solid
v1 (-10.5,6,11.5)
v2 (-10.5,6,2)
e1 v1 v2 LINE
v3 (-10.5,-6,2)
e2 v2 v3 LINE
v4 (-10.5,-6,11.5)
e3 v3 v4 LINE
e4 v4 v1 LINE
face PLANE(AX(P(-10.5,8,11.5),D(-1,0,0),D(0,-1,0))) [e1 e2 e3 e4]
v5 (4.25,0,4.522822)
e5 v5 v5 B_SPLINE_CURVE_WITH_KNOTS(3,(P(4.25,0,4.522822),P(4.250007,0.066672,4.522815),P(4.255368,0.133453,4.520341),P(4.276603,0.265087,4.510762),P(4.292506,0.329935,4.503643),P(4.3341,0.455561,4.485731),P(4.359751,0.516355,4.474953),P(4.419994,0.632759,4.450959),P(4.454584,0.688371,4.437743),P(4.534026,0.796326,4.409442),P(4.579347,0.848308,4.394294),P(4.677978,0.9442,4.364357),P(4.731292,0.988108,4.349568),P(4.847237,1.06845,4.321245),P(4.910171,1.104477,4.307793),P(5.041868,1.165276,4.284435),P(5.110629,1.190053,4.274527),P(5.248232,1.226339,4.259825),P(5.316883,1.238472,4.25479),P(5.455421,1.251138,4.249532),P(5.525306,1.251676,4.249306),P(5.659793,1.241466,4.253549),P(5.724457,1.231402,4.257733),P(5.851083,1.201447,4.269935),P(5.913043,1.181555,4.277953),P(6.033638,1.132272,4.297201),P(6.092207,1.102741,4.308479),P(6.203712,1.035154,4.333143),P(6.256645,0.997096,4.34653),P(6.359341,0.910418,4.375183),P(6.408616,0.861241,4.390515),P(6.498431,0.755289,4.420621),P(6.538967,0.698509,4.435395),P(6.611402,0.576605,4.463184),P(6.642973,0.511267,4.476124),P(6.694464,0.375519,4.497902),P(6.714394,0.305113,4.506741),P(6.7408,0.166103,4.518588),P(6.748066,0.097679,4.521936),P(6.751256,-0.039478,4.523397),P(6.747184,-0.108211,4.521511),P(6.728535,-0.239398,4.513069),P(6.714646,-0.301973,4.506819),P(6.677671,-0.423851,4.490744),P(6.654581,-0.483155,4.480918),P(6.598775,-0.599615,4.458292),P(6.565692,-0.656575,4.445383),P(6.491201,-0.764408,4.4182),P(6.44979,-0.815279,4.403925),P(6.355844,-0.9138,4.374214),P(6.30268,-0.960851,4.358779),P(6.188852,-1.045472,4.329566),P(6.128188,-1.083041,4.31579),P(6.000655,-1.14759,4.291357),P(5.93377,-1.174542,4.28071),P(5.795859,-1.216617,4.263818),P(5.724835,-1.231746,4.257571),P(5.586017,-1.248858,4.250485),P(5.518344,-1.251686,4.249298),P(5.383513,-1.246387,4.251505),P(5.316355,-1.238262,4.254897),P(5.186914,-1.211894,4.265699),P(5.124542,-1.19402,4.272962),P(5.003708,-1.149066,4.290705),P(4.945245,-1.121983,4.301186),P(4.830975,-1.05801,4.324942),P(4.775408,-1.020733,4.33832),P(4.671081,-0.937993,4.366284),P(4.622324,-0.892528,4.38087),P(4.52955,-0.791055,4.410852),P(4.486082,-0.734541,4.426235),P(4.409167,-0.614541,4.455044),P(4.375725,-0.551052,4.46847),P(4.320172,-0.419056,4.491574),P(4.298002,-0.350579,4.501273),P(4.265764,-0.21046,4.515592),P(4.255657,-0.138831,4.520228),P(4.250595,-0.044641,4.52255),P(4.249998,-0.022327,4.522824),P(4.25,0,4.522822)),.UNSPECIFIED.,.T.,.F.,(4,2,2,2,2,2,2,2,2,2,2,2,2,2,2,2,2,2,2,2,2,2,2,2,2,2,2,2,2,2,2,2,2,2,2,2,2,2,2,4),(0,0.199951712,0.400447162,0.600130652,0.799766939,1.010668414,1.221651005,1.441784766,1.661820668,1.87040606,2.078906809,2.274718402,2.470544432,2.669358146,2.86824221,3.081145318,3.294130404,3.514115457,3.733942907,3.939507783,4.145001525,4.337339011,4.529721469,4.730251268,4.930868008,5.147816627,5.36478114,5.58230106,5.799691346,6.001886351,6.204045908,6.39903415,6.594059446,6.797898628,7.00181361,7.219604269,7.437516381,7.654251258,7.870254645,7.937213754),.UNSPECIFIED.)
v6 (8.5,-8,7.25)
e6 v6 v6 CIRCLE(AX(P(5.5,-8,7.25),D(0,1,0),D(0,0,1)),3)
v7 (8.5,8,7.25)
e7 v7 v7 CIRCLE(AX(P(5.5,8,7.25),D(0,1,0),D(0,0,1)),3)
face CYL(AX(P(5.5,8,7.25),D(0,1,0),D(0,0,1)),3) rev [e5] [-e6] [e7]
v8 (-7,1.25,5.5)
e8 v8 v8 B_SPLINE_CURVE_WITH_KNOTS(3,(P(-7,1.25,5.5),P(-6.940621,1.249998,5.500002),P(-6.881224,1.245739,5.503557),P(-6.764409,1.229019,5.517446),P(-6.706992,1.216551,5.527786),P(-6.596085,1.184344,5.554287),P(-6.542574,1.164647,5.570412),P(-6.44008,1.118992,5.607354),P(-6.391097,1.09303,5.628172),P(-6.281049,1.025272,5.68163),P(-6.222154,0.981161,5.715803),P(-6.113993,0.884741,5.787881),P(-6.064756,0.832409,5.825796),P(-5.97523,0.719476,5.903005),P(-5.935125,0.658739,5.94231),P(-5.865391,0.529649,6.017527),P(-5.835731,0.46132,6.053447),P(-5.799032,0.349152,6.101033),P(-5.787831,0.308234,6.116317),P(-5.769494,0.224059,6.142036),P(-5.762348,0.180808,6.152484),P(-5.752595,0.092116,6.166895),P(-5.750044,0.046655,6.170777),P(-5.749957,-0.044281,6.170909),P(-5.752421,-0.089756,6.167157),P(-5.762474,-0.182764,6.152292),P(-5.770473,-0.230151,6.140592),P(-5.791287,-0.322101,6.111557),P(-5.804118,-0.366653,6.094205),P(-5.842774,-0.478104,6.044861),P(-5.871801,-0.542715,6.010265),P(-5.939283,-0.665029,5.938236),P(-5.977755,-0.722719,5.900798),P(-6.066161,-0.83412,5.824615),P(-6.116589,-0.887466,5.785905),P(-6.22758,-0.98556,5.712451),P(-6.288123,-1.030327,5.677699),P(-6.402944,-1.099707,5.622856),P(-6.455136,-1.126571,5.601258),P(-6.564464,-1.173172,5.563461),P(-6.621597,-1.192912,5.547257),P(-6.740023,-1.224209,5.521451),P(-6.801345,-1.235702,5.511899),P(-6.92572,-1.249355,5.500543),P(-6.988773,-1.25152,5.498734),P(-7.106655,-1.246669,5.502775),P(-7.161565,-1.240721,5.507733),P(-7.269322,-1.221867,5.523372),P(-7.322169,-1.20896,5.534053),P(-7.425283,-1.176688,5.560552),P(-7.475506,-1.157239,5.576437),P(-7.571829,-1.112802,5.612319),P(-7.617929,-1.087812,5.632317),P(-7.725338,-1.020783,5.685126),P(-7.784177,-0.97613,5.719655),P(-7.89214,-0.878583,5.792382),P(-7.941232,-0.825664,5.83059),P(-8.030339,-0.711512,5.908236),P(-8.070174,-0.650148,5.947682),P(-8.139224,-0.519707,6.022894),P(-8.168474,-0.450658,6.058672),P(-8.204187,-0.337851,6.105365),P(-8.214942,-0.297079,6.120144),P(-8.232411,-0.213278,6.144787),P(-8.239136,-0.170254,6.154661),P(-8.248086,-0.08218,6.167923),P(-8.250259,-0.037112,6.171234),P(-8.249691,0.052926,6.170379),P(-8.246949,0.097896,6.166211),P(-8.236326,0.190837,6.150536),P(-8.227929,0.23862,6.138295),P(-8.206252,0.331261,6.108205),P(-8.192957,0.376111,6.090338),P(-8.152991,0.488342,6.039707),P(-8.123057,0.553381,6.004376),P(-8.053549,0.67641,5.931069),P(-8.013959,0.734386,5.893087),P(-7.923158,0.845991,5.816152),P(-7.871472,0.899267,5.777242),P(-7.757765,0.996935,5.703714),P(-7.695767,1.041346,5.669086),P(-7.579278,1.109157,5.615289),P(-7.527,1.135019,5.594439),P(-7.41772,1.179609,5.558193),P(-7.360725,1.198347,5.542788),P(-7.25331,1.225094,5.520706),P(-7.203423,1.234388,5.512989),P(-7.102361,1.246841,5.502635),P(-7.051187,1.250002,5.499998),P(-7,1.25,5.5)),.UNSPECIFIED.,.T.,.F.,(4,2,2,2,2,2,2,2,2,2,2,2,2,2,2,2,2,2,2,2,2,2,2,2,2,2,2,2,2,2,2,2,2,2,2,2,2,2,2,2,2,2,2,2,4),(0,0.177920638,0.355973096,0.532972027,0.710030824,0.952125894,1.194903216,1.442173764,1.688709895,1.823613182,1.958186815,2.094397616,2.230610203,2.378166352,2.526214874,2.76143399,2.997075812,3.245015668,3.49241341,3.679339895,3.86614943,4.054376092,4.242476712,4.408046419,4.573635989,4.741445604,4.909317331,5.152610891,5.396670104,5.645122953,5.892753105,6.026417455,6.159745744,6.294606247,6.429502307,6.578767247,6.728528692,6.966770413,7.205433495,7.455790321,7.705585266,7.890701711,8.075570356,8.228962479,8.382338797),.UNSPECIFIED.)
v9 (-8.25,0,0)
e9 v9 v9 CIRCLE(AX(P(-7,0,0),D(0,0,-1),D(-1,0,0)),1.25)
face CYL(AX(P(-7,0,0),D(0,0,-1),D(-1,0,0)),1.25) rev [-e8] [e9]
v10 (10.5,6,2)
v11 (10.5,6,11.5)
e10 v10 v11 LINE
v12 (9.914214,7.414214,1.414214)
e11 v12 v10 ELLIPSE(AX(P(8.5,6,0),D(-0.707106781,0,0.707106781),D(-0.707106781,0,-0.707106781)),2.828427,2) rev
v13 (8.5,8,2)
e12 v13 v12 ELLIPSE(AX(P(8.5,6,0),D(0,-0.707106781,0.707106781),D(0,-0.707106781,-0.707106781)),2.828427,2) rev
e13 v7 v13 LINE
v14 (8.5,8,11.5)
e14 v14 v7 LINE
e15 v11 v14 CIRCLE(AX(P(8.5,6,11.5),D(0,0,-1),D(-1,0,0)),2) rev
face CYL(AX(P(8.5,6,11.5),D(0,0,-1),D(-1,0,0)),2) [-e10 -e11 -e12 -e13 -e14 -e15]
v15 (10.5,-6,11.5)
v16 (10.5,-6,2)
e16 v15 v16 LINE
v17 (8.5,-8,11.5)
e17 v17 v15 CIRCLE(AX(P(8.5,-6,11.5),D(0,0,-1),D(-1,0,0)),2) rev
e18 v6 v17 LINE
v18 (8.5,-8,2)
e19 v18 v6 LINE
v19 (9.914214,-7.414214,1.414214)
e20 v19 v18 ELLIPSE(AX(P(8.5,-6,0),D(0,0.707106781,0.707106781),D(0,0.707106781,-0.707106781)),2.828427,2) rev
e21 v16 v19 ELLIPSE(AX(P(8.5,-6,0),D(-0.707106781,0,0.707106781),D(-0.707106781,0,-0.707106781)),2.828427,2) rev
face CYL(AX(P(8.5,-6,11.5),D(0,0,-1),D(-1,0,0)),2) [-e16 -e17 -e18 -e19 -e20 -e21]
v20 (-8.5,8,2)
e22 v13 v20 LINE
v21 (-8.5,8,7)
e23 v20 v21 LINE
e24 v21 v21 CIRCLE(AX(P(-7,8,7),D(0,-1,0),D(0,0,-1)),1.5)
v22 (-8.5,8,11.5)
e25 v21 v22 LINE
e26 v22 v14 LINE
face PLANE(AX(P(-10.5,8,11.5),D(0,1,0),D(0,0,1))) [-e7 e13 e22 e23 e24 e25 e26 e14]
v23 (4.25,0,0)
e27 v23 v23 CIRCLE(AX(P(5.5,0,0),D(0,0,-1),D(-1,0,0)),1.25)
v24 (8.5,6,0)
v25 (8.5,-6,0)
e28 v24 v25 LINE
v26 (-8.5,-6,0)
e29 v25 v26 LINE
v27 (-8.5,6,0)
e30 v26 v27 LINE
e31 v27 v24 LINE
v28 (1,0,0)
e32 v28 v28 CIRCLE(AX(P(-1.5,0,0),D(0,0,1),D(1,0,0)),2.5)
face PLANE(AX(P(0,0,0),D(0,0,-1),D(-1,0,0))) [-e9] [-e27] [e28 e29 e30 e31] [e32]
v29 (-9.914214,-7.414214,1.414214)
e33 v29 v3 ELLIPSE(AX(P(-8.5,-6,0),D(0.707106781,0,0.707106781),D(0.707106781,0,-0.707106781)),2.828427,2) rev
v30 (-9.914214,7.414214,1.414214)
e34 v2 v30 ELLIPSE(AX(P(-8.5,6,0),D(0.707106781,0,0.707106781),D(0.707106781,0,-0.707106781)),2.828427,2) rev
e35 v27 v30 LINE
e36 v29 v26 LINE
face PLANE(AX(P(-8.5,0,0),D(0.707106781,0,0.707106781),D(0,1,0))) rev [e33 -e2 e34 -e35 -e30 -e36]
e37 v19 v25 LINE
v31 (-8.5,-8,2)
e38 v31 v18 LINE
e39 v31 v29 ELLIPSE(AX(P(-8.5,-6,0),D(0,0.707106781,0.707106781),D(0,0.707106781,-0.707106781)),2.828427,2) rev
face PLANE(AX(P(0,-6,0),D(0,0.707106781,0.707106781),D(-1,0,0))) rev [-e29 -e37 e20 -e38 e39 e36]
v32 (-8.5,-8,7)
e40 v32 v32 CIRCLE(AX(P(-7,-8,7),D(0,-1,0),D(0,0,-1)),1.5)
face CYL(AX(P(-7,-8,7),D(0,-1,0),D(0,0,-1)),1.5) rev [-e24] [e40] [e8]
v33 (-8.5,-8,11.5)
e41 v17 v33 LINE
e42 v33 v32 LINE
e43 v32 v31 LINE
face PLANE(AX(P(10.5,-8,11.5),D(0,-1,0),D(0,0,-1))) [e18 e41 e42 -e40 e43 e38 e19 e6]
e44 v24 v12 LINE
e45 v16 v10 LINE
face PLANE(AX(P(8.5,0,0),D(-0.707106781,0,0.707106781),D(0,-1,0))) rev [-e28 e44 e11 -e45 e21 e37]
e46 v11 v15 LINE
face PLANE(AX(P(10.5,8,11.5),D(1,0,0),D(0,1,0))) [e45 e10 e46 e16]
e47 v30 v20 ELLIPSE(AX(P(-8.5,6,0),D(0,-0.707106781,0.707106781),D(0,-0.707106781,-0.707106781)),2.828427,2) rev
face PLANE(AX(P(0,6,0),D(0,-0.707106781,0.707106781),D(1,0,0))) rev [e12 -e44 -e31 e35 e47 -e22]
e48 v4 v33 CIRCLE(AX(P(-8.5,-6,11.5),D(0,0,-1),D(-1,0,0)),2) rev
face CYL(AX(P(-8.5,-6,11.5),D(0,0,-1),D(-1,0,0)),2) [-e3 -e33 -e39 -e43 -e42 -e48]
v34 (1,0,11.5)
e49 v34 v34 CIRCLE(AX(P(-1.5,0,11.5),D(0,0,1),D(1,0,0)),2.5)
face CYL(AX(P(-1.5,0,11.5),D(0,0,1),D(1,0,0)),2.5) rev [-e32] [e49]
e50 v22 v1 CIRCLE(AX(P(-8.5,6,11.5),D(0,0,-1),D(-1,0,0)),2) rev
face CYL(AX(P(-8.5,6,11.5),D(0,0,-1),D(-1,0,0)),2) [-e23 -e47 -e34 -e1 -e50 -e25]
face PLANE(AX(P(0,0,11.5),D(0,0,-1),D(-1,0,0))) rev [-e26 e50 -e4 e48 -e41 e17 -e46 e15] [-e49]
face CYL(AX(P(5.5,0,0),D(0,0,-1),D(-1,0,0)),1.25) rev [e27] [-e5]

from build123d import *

# Parameters (mm, degrees)
SKETCH1_W                  = 21
SKETCH1_H                  = 16
BOSS_EXTRUDE1_DEPTH        = 11.5
F_10_CLEARANCE_HOLE1_D     = 5
F_12_CLEARANCE_HOLE1_D     = 6
F_2_CLEARANCE_HOLE1_REACH  = 19.507
F_2_CLEARANCE_HOLE1_BORE_R = 1.25
F_3_CLEARANCE_HOLE2_D      = 3
F_2_CLEARANCE_HOLE2_REACH  = 19.507
F_2_CLEARANCE_HOLE2_BORE_R = 1.25
CHAMFER2_SIZE              = 2
FILLET1_R                  = 2


with BuildPart() as part:
    # Sketch1 → Boss-Extrude1 (new body)
    with BuildSketch(Plane(origin=(0, 0, 0), x_dir=(-1, 0, 0), z_dir=(0, 0, -1))):
        Rectangle(SKETCH1_W, SKETCH1_H)
    extrude(amount=-BOSS_EXTRUDE1_DEPTH)

    # #10 Clearance Hole1 (through all)
    with Locations(Plane.XY.offset(11.5)):
        with Locations((-1.5, 0)):
            Hole(F_10_CLEARANCE_HOLE1_D / 2)

    # #12 Clearance Hole1 (through all)
    with Locations(Plane(origin=(0, 8, 0), x_dir=(1, 0, 0), z_dir=(0, 1, 0))):
        with Locations((5.5, -7.25)):
            Hole(F_12_CLEARANCE_HOLE1_D / 2)

    # #2 Clearance Hole1 bore → #2 Clearance Hole1 (cut, up to next)
    with BuildSketch(Plane(origin=(0, 0, 0), x_dir=(-1, 0, 0), z_dir=(0, 0, -1)), mode=Mode.PRIVATE) as f_2_clearance_hole1_sk1:
        with Locations((-5.5, 0)):
            Circle(F_2_CLEARANCE_HOLE1_BORE_R)
    f_2_clearance_hole1_tool1 = extrude(f_2_clearance_hole1_sk1.sketch, amount=-F_2_CLEARANCE_HOLE1_REACH, mode=Mode.PRIVATE) & part.part
    add(f_2_clearance_hole1_tool1.solids().sort_by_distance((5.5, 0, 0))[0], mode=Mode.SUBTRACT)

    # #3 Clearance Hole2 (through all)
    with Locations(Plane(origin=(0, -8, 0), x_dir=(-1, 0, 0), z_dir=(0, -1, 0))):
        with Locations((7, -7)):
            Hole(F_3_CLEARANCE_HOLE2_D / 2)

    # #2 Clearance Hole2 bore → #2 Clearance Hole2 (cut, up to next)
    with BuildSketch(Plane(origin=(0, 0, 0), x_dir=(-1, 0, 0), z_dir=(0, 0, -1)), mode=Mode.PRIVATE) as f_2_clearance_hole2_sk1:
        with Locations((7, 0)):
            Circle(F_2_CLEARANCE_HOLE2_BORE_R)
    f_2_clearance_hole2_tool1 = extrude(f_2_clearance_hole2_sk1.sketch, amount=-F_2_CLEARANCE_HOLE2_REACH, mode=Mode.PRIVATE) & part.part
    add(f_2_clearance_hole2_tool1.solids().sort_by_distance((-7, 0, 0))[0], mode=Mode.SUBTRACT)

    # Chamfer2
    chamfer2_edges = [part.edges().sort_by_distance(p)[0] for p in [
        (0, -8, 0),
        (10.5, 0, 0),
        (0, 8, 0),
        (-10.5, 0, 0),
    ]]
    chamfer(chamfer2_edges, length=CHAMFER2_SIZE)

    # Fillet1
    fillet1_edges = [part.edges().sort_by_distance(p)[0] for p in [
        (-10.5, -8, 6.75),
        (10.5, -8, 6.75),
        (10.5, 8, 6.75),
        (-10.5, 8, 6.75),
    ]]
    fillet(fillet1_edges, radius=FILLET1_R - 0.0001)  # a hair under: the kernel refuses the full size


solid = part.part
